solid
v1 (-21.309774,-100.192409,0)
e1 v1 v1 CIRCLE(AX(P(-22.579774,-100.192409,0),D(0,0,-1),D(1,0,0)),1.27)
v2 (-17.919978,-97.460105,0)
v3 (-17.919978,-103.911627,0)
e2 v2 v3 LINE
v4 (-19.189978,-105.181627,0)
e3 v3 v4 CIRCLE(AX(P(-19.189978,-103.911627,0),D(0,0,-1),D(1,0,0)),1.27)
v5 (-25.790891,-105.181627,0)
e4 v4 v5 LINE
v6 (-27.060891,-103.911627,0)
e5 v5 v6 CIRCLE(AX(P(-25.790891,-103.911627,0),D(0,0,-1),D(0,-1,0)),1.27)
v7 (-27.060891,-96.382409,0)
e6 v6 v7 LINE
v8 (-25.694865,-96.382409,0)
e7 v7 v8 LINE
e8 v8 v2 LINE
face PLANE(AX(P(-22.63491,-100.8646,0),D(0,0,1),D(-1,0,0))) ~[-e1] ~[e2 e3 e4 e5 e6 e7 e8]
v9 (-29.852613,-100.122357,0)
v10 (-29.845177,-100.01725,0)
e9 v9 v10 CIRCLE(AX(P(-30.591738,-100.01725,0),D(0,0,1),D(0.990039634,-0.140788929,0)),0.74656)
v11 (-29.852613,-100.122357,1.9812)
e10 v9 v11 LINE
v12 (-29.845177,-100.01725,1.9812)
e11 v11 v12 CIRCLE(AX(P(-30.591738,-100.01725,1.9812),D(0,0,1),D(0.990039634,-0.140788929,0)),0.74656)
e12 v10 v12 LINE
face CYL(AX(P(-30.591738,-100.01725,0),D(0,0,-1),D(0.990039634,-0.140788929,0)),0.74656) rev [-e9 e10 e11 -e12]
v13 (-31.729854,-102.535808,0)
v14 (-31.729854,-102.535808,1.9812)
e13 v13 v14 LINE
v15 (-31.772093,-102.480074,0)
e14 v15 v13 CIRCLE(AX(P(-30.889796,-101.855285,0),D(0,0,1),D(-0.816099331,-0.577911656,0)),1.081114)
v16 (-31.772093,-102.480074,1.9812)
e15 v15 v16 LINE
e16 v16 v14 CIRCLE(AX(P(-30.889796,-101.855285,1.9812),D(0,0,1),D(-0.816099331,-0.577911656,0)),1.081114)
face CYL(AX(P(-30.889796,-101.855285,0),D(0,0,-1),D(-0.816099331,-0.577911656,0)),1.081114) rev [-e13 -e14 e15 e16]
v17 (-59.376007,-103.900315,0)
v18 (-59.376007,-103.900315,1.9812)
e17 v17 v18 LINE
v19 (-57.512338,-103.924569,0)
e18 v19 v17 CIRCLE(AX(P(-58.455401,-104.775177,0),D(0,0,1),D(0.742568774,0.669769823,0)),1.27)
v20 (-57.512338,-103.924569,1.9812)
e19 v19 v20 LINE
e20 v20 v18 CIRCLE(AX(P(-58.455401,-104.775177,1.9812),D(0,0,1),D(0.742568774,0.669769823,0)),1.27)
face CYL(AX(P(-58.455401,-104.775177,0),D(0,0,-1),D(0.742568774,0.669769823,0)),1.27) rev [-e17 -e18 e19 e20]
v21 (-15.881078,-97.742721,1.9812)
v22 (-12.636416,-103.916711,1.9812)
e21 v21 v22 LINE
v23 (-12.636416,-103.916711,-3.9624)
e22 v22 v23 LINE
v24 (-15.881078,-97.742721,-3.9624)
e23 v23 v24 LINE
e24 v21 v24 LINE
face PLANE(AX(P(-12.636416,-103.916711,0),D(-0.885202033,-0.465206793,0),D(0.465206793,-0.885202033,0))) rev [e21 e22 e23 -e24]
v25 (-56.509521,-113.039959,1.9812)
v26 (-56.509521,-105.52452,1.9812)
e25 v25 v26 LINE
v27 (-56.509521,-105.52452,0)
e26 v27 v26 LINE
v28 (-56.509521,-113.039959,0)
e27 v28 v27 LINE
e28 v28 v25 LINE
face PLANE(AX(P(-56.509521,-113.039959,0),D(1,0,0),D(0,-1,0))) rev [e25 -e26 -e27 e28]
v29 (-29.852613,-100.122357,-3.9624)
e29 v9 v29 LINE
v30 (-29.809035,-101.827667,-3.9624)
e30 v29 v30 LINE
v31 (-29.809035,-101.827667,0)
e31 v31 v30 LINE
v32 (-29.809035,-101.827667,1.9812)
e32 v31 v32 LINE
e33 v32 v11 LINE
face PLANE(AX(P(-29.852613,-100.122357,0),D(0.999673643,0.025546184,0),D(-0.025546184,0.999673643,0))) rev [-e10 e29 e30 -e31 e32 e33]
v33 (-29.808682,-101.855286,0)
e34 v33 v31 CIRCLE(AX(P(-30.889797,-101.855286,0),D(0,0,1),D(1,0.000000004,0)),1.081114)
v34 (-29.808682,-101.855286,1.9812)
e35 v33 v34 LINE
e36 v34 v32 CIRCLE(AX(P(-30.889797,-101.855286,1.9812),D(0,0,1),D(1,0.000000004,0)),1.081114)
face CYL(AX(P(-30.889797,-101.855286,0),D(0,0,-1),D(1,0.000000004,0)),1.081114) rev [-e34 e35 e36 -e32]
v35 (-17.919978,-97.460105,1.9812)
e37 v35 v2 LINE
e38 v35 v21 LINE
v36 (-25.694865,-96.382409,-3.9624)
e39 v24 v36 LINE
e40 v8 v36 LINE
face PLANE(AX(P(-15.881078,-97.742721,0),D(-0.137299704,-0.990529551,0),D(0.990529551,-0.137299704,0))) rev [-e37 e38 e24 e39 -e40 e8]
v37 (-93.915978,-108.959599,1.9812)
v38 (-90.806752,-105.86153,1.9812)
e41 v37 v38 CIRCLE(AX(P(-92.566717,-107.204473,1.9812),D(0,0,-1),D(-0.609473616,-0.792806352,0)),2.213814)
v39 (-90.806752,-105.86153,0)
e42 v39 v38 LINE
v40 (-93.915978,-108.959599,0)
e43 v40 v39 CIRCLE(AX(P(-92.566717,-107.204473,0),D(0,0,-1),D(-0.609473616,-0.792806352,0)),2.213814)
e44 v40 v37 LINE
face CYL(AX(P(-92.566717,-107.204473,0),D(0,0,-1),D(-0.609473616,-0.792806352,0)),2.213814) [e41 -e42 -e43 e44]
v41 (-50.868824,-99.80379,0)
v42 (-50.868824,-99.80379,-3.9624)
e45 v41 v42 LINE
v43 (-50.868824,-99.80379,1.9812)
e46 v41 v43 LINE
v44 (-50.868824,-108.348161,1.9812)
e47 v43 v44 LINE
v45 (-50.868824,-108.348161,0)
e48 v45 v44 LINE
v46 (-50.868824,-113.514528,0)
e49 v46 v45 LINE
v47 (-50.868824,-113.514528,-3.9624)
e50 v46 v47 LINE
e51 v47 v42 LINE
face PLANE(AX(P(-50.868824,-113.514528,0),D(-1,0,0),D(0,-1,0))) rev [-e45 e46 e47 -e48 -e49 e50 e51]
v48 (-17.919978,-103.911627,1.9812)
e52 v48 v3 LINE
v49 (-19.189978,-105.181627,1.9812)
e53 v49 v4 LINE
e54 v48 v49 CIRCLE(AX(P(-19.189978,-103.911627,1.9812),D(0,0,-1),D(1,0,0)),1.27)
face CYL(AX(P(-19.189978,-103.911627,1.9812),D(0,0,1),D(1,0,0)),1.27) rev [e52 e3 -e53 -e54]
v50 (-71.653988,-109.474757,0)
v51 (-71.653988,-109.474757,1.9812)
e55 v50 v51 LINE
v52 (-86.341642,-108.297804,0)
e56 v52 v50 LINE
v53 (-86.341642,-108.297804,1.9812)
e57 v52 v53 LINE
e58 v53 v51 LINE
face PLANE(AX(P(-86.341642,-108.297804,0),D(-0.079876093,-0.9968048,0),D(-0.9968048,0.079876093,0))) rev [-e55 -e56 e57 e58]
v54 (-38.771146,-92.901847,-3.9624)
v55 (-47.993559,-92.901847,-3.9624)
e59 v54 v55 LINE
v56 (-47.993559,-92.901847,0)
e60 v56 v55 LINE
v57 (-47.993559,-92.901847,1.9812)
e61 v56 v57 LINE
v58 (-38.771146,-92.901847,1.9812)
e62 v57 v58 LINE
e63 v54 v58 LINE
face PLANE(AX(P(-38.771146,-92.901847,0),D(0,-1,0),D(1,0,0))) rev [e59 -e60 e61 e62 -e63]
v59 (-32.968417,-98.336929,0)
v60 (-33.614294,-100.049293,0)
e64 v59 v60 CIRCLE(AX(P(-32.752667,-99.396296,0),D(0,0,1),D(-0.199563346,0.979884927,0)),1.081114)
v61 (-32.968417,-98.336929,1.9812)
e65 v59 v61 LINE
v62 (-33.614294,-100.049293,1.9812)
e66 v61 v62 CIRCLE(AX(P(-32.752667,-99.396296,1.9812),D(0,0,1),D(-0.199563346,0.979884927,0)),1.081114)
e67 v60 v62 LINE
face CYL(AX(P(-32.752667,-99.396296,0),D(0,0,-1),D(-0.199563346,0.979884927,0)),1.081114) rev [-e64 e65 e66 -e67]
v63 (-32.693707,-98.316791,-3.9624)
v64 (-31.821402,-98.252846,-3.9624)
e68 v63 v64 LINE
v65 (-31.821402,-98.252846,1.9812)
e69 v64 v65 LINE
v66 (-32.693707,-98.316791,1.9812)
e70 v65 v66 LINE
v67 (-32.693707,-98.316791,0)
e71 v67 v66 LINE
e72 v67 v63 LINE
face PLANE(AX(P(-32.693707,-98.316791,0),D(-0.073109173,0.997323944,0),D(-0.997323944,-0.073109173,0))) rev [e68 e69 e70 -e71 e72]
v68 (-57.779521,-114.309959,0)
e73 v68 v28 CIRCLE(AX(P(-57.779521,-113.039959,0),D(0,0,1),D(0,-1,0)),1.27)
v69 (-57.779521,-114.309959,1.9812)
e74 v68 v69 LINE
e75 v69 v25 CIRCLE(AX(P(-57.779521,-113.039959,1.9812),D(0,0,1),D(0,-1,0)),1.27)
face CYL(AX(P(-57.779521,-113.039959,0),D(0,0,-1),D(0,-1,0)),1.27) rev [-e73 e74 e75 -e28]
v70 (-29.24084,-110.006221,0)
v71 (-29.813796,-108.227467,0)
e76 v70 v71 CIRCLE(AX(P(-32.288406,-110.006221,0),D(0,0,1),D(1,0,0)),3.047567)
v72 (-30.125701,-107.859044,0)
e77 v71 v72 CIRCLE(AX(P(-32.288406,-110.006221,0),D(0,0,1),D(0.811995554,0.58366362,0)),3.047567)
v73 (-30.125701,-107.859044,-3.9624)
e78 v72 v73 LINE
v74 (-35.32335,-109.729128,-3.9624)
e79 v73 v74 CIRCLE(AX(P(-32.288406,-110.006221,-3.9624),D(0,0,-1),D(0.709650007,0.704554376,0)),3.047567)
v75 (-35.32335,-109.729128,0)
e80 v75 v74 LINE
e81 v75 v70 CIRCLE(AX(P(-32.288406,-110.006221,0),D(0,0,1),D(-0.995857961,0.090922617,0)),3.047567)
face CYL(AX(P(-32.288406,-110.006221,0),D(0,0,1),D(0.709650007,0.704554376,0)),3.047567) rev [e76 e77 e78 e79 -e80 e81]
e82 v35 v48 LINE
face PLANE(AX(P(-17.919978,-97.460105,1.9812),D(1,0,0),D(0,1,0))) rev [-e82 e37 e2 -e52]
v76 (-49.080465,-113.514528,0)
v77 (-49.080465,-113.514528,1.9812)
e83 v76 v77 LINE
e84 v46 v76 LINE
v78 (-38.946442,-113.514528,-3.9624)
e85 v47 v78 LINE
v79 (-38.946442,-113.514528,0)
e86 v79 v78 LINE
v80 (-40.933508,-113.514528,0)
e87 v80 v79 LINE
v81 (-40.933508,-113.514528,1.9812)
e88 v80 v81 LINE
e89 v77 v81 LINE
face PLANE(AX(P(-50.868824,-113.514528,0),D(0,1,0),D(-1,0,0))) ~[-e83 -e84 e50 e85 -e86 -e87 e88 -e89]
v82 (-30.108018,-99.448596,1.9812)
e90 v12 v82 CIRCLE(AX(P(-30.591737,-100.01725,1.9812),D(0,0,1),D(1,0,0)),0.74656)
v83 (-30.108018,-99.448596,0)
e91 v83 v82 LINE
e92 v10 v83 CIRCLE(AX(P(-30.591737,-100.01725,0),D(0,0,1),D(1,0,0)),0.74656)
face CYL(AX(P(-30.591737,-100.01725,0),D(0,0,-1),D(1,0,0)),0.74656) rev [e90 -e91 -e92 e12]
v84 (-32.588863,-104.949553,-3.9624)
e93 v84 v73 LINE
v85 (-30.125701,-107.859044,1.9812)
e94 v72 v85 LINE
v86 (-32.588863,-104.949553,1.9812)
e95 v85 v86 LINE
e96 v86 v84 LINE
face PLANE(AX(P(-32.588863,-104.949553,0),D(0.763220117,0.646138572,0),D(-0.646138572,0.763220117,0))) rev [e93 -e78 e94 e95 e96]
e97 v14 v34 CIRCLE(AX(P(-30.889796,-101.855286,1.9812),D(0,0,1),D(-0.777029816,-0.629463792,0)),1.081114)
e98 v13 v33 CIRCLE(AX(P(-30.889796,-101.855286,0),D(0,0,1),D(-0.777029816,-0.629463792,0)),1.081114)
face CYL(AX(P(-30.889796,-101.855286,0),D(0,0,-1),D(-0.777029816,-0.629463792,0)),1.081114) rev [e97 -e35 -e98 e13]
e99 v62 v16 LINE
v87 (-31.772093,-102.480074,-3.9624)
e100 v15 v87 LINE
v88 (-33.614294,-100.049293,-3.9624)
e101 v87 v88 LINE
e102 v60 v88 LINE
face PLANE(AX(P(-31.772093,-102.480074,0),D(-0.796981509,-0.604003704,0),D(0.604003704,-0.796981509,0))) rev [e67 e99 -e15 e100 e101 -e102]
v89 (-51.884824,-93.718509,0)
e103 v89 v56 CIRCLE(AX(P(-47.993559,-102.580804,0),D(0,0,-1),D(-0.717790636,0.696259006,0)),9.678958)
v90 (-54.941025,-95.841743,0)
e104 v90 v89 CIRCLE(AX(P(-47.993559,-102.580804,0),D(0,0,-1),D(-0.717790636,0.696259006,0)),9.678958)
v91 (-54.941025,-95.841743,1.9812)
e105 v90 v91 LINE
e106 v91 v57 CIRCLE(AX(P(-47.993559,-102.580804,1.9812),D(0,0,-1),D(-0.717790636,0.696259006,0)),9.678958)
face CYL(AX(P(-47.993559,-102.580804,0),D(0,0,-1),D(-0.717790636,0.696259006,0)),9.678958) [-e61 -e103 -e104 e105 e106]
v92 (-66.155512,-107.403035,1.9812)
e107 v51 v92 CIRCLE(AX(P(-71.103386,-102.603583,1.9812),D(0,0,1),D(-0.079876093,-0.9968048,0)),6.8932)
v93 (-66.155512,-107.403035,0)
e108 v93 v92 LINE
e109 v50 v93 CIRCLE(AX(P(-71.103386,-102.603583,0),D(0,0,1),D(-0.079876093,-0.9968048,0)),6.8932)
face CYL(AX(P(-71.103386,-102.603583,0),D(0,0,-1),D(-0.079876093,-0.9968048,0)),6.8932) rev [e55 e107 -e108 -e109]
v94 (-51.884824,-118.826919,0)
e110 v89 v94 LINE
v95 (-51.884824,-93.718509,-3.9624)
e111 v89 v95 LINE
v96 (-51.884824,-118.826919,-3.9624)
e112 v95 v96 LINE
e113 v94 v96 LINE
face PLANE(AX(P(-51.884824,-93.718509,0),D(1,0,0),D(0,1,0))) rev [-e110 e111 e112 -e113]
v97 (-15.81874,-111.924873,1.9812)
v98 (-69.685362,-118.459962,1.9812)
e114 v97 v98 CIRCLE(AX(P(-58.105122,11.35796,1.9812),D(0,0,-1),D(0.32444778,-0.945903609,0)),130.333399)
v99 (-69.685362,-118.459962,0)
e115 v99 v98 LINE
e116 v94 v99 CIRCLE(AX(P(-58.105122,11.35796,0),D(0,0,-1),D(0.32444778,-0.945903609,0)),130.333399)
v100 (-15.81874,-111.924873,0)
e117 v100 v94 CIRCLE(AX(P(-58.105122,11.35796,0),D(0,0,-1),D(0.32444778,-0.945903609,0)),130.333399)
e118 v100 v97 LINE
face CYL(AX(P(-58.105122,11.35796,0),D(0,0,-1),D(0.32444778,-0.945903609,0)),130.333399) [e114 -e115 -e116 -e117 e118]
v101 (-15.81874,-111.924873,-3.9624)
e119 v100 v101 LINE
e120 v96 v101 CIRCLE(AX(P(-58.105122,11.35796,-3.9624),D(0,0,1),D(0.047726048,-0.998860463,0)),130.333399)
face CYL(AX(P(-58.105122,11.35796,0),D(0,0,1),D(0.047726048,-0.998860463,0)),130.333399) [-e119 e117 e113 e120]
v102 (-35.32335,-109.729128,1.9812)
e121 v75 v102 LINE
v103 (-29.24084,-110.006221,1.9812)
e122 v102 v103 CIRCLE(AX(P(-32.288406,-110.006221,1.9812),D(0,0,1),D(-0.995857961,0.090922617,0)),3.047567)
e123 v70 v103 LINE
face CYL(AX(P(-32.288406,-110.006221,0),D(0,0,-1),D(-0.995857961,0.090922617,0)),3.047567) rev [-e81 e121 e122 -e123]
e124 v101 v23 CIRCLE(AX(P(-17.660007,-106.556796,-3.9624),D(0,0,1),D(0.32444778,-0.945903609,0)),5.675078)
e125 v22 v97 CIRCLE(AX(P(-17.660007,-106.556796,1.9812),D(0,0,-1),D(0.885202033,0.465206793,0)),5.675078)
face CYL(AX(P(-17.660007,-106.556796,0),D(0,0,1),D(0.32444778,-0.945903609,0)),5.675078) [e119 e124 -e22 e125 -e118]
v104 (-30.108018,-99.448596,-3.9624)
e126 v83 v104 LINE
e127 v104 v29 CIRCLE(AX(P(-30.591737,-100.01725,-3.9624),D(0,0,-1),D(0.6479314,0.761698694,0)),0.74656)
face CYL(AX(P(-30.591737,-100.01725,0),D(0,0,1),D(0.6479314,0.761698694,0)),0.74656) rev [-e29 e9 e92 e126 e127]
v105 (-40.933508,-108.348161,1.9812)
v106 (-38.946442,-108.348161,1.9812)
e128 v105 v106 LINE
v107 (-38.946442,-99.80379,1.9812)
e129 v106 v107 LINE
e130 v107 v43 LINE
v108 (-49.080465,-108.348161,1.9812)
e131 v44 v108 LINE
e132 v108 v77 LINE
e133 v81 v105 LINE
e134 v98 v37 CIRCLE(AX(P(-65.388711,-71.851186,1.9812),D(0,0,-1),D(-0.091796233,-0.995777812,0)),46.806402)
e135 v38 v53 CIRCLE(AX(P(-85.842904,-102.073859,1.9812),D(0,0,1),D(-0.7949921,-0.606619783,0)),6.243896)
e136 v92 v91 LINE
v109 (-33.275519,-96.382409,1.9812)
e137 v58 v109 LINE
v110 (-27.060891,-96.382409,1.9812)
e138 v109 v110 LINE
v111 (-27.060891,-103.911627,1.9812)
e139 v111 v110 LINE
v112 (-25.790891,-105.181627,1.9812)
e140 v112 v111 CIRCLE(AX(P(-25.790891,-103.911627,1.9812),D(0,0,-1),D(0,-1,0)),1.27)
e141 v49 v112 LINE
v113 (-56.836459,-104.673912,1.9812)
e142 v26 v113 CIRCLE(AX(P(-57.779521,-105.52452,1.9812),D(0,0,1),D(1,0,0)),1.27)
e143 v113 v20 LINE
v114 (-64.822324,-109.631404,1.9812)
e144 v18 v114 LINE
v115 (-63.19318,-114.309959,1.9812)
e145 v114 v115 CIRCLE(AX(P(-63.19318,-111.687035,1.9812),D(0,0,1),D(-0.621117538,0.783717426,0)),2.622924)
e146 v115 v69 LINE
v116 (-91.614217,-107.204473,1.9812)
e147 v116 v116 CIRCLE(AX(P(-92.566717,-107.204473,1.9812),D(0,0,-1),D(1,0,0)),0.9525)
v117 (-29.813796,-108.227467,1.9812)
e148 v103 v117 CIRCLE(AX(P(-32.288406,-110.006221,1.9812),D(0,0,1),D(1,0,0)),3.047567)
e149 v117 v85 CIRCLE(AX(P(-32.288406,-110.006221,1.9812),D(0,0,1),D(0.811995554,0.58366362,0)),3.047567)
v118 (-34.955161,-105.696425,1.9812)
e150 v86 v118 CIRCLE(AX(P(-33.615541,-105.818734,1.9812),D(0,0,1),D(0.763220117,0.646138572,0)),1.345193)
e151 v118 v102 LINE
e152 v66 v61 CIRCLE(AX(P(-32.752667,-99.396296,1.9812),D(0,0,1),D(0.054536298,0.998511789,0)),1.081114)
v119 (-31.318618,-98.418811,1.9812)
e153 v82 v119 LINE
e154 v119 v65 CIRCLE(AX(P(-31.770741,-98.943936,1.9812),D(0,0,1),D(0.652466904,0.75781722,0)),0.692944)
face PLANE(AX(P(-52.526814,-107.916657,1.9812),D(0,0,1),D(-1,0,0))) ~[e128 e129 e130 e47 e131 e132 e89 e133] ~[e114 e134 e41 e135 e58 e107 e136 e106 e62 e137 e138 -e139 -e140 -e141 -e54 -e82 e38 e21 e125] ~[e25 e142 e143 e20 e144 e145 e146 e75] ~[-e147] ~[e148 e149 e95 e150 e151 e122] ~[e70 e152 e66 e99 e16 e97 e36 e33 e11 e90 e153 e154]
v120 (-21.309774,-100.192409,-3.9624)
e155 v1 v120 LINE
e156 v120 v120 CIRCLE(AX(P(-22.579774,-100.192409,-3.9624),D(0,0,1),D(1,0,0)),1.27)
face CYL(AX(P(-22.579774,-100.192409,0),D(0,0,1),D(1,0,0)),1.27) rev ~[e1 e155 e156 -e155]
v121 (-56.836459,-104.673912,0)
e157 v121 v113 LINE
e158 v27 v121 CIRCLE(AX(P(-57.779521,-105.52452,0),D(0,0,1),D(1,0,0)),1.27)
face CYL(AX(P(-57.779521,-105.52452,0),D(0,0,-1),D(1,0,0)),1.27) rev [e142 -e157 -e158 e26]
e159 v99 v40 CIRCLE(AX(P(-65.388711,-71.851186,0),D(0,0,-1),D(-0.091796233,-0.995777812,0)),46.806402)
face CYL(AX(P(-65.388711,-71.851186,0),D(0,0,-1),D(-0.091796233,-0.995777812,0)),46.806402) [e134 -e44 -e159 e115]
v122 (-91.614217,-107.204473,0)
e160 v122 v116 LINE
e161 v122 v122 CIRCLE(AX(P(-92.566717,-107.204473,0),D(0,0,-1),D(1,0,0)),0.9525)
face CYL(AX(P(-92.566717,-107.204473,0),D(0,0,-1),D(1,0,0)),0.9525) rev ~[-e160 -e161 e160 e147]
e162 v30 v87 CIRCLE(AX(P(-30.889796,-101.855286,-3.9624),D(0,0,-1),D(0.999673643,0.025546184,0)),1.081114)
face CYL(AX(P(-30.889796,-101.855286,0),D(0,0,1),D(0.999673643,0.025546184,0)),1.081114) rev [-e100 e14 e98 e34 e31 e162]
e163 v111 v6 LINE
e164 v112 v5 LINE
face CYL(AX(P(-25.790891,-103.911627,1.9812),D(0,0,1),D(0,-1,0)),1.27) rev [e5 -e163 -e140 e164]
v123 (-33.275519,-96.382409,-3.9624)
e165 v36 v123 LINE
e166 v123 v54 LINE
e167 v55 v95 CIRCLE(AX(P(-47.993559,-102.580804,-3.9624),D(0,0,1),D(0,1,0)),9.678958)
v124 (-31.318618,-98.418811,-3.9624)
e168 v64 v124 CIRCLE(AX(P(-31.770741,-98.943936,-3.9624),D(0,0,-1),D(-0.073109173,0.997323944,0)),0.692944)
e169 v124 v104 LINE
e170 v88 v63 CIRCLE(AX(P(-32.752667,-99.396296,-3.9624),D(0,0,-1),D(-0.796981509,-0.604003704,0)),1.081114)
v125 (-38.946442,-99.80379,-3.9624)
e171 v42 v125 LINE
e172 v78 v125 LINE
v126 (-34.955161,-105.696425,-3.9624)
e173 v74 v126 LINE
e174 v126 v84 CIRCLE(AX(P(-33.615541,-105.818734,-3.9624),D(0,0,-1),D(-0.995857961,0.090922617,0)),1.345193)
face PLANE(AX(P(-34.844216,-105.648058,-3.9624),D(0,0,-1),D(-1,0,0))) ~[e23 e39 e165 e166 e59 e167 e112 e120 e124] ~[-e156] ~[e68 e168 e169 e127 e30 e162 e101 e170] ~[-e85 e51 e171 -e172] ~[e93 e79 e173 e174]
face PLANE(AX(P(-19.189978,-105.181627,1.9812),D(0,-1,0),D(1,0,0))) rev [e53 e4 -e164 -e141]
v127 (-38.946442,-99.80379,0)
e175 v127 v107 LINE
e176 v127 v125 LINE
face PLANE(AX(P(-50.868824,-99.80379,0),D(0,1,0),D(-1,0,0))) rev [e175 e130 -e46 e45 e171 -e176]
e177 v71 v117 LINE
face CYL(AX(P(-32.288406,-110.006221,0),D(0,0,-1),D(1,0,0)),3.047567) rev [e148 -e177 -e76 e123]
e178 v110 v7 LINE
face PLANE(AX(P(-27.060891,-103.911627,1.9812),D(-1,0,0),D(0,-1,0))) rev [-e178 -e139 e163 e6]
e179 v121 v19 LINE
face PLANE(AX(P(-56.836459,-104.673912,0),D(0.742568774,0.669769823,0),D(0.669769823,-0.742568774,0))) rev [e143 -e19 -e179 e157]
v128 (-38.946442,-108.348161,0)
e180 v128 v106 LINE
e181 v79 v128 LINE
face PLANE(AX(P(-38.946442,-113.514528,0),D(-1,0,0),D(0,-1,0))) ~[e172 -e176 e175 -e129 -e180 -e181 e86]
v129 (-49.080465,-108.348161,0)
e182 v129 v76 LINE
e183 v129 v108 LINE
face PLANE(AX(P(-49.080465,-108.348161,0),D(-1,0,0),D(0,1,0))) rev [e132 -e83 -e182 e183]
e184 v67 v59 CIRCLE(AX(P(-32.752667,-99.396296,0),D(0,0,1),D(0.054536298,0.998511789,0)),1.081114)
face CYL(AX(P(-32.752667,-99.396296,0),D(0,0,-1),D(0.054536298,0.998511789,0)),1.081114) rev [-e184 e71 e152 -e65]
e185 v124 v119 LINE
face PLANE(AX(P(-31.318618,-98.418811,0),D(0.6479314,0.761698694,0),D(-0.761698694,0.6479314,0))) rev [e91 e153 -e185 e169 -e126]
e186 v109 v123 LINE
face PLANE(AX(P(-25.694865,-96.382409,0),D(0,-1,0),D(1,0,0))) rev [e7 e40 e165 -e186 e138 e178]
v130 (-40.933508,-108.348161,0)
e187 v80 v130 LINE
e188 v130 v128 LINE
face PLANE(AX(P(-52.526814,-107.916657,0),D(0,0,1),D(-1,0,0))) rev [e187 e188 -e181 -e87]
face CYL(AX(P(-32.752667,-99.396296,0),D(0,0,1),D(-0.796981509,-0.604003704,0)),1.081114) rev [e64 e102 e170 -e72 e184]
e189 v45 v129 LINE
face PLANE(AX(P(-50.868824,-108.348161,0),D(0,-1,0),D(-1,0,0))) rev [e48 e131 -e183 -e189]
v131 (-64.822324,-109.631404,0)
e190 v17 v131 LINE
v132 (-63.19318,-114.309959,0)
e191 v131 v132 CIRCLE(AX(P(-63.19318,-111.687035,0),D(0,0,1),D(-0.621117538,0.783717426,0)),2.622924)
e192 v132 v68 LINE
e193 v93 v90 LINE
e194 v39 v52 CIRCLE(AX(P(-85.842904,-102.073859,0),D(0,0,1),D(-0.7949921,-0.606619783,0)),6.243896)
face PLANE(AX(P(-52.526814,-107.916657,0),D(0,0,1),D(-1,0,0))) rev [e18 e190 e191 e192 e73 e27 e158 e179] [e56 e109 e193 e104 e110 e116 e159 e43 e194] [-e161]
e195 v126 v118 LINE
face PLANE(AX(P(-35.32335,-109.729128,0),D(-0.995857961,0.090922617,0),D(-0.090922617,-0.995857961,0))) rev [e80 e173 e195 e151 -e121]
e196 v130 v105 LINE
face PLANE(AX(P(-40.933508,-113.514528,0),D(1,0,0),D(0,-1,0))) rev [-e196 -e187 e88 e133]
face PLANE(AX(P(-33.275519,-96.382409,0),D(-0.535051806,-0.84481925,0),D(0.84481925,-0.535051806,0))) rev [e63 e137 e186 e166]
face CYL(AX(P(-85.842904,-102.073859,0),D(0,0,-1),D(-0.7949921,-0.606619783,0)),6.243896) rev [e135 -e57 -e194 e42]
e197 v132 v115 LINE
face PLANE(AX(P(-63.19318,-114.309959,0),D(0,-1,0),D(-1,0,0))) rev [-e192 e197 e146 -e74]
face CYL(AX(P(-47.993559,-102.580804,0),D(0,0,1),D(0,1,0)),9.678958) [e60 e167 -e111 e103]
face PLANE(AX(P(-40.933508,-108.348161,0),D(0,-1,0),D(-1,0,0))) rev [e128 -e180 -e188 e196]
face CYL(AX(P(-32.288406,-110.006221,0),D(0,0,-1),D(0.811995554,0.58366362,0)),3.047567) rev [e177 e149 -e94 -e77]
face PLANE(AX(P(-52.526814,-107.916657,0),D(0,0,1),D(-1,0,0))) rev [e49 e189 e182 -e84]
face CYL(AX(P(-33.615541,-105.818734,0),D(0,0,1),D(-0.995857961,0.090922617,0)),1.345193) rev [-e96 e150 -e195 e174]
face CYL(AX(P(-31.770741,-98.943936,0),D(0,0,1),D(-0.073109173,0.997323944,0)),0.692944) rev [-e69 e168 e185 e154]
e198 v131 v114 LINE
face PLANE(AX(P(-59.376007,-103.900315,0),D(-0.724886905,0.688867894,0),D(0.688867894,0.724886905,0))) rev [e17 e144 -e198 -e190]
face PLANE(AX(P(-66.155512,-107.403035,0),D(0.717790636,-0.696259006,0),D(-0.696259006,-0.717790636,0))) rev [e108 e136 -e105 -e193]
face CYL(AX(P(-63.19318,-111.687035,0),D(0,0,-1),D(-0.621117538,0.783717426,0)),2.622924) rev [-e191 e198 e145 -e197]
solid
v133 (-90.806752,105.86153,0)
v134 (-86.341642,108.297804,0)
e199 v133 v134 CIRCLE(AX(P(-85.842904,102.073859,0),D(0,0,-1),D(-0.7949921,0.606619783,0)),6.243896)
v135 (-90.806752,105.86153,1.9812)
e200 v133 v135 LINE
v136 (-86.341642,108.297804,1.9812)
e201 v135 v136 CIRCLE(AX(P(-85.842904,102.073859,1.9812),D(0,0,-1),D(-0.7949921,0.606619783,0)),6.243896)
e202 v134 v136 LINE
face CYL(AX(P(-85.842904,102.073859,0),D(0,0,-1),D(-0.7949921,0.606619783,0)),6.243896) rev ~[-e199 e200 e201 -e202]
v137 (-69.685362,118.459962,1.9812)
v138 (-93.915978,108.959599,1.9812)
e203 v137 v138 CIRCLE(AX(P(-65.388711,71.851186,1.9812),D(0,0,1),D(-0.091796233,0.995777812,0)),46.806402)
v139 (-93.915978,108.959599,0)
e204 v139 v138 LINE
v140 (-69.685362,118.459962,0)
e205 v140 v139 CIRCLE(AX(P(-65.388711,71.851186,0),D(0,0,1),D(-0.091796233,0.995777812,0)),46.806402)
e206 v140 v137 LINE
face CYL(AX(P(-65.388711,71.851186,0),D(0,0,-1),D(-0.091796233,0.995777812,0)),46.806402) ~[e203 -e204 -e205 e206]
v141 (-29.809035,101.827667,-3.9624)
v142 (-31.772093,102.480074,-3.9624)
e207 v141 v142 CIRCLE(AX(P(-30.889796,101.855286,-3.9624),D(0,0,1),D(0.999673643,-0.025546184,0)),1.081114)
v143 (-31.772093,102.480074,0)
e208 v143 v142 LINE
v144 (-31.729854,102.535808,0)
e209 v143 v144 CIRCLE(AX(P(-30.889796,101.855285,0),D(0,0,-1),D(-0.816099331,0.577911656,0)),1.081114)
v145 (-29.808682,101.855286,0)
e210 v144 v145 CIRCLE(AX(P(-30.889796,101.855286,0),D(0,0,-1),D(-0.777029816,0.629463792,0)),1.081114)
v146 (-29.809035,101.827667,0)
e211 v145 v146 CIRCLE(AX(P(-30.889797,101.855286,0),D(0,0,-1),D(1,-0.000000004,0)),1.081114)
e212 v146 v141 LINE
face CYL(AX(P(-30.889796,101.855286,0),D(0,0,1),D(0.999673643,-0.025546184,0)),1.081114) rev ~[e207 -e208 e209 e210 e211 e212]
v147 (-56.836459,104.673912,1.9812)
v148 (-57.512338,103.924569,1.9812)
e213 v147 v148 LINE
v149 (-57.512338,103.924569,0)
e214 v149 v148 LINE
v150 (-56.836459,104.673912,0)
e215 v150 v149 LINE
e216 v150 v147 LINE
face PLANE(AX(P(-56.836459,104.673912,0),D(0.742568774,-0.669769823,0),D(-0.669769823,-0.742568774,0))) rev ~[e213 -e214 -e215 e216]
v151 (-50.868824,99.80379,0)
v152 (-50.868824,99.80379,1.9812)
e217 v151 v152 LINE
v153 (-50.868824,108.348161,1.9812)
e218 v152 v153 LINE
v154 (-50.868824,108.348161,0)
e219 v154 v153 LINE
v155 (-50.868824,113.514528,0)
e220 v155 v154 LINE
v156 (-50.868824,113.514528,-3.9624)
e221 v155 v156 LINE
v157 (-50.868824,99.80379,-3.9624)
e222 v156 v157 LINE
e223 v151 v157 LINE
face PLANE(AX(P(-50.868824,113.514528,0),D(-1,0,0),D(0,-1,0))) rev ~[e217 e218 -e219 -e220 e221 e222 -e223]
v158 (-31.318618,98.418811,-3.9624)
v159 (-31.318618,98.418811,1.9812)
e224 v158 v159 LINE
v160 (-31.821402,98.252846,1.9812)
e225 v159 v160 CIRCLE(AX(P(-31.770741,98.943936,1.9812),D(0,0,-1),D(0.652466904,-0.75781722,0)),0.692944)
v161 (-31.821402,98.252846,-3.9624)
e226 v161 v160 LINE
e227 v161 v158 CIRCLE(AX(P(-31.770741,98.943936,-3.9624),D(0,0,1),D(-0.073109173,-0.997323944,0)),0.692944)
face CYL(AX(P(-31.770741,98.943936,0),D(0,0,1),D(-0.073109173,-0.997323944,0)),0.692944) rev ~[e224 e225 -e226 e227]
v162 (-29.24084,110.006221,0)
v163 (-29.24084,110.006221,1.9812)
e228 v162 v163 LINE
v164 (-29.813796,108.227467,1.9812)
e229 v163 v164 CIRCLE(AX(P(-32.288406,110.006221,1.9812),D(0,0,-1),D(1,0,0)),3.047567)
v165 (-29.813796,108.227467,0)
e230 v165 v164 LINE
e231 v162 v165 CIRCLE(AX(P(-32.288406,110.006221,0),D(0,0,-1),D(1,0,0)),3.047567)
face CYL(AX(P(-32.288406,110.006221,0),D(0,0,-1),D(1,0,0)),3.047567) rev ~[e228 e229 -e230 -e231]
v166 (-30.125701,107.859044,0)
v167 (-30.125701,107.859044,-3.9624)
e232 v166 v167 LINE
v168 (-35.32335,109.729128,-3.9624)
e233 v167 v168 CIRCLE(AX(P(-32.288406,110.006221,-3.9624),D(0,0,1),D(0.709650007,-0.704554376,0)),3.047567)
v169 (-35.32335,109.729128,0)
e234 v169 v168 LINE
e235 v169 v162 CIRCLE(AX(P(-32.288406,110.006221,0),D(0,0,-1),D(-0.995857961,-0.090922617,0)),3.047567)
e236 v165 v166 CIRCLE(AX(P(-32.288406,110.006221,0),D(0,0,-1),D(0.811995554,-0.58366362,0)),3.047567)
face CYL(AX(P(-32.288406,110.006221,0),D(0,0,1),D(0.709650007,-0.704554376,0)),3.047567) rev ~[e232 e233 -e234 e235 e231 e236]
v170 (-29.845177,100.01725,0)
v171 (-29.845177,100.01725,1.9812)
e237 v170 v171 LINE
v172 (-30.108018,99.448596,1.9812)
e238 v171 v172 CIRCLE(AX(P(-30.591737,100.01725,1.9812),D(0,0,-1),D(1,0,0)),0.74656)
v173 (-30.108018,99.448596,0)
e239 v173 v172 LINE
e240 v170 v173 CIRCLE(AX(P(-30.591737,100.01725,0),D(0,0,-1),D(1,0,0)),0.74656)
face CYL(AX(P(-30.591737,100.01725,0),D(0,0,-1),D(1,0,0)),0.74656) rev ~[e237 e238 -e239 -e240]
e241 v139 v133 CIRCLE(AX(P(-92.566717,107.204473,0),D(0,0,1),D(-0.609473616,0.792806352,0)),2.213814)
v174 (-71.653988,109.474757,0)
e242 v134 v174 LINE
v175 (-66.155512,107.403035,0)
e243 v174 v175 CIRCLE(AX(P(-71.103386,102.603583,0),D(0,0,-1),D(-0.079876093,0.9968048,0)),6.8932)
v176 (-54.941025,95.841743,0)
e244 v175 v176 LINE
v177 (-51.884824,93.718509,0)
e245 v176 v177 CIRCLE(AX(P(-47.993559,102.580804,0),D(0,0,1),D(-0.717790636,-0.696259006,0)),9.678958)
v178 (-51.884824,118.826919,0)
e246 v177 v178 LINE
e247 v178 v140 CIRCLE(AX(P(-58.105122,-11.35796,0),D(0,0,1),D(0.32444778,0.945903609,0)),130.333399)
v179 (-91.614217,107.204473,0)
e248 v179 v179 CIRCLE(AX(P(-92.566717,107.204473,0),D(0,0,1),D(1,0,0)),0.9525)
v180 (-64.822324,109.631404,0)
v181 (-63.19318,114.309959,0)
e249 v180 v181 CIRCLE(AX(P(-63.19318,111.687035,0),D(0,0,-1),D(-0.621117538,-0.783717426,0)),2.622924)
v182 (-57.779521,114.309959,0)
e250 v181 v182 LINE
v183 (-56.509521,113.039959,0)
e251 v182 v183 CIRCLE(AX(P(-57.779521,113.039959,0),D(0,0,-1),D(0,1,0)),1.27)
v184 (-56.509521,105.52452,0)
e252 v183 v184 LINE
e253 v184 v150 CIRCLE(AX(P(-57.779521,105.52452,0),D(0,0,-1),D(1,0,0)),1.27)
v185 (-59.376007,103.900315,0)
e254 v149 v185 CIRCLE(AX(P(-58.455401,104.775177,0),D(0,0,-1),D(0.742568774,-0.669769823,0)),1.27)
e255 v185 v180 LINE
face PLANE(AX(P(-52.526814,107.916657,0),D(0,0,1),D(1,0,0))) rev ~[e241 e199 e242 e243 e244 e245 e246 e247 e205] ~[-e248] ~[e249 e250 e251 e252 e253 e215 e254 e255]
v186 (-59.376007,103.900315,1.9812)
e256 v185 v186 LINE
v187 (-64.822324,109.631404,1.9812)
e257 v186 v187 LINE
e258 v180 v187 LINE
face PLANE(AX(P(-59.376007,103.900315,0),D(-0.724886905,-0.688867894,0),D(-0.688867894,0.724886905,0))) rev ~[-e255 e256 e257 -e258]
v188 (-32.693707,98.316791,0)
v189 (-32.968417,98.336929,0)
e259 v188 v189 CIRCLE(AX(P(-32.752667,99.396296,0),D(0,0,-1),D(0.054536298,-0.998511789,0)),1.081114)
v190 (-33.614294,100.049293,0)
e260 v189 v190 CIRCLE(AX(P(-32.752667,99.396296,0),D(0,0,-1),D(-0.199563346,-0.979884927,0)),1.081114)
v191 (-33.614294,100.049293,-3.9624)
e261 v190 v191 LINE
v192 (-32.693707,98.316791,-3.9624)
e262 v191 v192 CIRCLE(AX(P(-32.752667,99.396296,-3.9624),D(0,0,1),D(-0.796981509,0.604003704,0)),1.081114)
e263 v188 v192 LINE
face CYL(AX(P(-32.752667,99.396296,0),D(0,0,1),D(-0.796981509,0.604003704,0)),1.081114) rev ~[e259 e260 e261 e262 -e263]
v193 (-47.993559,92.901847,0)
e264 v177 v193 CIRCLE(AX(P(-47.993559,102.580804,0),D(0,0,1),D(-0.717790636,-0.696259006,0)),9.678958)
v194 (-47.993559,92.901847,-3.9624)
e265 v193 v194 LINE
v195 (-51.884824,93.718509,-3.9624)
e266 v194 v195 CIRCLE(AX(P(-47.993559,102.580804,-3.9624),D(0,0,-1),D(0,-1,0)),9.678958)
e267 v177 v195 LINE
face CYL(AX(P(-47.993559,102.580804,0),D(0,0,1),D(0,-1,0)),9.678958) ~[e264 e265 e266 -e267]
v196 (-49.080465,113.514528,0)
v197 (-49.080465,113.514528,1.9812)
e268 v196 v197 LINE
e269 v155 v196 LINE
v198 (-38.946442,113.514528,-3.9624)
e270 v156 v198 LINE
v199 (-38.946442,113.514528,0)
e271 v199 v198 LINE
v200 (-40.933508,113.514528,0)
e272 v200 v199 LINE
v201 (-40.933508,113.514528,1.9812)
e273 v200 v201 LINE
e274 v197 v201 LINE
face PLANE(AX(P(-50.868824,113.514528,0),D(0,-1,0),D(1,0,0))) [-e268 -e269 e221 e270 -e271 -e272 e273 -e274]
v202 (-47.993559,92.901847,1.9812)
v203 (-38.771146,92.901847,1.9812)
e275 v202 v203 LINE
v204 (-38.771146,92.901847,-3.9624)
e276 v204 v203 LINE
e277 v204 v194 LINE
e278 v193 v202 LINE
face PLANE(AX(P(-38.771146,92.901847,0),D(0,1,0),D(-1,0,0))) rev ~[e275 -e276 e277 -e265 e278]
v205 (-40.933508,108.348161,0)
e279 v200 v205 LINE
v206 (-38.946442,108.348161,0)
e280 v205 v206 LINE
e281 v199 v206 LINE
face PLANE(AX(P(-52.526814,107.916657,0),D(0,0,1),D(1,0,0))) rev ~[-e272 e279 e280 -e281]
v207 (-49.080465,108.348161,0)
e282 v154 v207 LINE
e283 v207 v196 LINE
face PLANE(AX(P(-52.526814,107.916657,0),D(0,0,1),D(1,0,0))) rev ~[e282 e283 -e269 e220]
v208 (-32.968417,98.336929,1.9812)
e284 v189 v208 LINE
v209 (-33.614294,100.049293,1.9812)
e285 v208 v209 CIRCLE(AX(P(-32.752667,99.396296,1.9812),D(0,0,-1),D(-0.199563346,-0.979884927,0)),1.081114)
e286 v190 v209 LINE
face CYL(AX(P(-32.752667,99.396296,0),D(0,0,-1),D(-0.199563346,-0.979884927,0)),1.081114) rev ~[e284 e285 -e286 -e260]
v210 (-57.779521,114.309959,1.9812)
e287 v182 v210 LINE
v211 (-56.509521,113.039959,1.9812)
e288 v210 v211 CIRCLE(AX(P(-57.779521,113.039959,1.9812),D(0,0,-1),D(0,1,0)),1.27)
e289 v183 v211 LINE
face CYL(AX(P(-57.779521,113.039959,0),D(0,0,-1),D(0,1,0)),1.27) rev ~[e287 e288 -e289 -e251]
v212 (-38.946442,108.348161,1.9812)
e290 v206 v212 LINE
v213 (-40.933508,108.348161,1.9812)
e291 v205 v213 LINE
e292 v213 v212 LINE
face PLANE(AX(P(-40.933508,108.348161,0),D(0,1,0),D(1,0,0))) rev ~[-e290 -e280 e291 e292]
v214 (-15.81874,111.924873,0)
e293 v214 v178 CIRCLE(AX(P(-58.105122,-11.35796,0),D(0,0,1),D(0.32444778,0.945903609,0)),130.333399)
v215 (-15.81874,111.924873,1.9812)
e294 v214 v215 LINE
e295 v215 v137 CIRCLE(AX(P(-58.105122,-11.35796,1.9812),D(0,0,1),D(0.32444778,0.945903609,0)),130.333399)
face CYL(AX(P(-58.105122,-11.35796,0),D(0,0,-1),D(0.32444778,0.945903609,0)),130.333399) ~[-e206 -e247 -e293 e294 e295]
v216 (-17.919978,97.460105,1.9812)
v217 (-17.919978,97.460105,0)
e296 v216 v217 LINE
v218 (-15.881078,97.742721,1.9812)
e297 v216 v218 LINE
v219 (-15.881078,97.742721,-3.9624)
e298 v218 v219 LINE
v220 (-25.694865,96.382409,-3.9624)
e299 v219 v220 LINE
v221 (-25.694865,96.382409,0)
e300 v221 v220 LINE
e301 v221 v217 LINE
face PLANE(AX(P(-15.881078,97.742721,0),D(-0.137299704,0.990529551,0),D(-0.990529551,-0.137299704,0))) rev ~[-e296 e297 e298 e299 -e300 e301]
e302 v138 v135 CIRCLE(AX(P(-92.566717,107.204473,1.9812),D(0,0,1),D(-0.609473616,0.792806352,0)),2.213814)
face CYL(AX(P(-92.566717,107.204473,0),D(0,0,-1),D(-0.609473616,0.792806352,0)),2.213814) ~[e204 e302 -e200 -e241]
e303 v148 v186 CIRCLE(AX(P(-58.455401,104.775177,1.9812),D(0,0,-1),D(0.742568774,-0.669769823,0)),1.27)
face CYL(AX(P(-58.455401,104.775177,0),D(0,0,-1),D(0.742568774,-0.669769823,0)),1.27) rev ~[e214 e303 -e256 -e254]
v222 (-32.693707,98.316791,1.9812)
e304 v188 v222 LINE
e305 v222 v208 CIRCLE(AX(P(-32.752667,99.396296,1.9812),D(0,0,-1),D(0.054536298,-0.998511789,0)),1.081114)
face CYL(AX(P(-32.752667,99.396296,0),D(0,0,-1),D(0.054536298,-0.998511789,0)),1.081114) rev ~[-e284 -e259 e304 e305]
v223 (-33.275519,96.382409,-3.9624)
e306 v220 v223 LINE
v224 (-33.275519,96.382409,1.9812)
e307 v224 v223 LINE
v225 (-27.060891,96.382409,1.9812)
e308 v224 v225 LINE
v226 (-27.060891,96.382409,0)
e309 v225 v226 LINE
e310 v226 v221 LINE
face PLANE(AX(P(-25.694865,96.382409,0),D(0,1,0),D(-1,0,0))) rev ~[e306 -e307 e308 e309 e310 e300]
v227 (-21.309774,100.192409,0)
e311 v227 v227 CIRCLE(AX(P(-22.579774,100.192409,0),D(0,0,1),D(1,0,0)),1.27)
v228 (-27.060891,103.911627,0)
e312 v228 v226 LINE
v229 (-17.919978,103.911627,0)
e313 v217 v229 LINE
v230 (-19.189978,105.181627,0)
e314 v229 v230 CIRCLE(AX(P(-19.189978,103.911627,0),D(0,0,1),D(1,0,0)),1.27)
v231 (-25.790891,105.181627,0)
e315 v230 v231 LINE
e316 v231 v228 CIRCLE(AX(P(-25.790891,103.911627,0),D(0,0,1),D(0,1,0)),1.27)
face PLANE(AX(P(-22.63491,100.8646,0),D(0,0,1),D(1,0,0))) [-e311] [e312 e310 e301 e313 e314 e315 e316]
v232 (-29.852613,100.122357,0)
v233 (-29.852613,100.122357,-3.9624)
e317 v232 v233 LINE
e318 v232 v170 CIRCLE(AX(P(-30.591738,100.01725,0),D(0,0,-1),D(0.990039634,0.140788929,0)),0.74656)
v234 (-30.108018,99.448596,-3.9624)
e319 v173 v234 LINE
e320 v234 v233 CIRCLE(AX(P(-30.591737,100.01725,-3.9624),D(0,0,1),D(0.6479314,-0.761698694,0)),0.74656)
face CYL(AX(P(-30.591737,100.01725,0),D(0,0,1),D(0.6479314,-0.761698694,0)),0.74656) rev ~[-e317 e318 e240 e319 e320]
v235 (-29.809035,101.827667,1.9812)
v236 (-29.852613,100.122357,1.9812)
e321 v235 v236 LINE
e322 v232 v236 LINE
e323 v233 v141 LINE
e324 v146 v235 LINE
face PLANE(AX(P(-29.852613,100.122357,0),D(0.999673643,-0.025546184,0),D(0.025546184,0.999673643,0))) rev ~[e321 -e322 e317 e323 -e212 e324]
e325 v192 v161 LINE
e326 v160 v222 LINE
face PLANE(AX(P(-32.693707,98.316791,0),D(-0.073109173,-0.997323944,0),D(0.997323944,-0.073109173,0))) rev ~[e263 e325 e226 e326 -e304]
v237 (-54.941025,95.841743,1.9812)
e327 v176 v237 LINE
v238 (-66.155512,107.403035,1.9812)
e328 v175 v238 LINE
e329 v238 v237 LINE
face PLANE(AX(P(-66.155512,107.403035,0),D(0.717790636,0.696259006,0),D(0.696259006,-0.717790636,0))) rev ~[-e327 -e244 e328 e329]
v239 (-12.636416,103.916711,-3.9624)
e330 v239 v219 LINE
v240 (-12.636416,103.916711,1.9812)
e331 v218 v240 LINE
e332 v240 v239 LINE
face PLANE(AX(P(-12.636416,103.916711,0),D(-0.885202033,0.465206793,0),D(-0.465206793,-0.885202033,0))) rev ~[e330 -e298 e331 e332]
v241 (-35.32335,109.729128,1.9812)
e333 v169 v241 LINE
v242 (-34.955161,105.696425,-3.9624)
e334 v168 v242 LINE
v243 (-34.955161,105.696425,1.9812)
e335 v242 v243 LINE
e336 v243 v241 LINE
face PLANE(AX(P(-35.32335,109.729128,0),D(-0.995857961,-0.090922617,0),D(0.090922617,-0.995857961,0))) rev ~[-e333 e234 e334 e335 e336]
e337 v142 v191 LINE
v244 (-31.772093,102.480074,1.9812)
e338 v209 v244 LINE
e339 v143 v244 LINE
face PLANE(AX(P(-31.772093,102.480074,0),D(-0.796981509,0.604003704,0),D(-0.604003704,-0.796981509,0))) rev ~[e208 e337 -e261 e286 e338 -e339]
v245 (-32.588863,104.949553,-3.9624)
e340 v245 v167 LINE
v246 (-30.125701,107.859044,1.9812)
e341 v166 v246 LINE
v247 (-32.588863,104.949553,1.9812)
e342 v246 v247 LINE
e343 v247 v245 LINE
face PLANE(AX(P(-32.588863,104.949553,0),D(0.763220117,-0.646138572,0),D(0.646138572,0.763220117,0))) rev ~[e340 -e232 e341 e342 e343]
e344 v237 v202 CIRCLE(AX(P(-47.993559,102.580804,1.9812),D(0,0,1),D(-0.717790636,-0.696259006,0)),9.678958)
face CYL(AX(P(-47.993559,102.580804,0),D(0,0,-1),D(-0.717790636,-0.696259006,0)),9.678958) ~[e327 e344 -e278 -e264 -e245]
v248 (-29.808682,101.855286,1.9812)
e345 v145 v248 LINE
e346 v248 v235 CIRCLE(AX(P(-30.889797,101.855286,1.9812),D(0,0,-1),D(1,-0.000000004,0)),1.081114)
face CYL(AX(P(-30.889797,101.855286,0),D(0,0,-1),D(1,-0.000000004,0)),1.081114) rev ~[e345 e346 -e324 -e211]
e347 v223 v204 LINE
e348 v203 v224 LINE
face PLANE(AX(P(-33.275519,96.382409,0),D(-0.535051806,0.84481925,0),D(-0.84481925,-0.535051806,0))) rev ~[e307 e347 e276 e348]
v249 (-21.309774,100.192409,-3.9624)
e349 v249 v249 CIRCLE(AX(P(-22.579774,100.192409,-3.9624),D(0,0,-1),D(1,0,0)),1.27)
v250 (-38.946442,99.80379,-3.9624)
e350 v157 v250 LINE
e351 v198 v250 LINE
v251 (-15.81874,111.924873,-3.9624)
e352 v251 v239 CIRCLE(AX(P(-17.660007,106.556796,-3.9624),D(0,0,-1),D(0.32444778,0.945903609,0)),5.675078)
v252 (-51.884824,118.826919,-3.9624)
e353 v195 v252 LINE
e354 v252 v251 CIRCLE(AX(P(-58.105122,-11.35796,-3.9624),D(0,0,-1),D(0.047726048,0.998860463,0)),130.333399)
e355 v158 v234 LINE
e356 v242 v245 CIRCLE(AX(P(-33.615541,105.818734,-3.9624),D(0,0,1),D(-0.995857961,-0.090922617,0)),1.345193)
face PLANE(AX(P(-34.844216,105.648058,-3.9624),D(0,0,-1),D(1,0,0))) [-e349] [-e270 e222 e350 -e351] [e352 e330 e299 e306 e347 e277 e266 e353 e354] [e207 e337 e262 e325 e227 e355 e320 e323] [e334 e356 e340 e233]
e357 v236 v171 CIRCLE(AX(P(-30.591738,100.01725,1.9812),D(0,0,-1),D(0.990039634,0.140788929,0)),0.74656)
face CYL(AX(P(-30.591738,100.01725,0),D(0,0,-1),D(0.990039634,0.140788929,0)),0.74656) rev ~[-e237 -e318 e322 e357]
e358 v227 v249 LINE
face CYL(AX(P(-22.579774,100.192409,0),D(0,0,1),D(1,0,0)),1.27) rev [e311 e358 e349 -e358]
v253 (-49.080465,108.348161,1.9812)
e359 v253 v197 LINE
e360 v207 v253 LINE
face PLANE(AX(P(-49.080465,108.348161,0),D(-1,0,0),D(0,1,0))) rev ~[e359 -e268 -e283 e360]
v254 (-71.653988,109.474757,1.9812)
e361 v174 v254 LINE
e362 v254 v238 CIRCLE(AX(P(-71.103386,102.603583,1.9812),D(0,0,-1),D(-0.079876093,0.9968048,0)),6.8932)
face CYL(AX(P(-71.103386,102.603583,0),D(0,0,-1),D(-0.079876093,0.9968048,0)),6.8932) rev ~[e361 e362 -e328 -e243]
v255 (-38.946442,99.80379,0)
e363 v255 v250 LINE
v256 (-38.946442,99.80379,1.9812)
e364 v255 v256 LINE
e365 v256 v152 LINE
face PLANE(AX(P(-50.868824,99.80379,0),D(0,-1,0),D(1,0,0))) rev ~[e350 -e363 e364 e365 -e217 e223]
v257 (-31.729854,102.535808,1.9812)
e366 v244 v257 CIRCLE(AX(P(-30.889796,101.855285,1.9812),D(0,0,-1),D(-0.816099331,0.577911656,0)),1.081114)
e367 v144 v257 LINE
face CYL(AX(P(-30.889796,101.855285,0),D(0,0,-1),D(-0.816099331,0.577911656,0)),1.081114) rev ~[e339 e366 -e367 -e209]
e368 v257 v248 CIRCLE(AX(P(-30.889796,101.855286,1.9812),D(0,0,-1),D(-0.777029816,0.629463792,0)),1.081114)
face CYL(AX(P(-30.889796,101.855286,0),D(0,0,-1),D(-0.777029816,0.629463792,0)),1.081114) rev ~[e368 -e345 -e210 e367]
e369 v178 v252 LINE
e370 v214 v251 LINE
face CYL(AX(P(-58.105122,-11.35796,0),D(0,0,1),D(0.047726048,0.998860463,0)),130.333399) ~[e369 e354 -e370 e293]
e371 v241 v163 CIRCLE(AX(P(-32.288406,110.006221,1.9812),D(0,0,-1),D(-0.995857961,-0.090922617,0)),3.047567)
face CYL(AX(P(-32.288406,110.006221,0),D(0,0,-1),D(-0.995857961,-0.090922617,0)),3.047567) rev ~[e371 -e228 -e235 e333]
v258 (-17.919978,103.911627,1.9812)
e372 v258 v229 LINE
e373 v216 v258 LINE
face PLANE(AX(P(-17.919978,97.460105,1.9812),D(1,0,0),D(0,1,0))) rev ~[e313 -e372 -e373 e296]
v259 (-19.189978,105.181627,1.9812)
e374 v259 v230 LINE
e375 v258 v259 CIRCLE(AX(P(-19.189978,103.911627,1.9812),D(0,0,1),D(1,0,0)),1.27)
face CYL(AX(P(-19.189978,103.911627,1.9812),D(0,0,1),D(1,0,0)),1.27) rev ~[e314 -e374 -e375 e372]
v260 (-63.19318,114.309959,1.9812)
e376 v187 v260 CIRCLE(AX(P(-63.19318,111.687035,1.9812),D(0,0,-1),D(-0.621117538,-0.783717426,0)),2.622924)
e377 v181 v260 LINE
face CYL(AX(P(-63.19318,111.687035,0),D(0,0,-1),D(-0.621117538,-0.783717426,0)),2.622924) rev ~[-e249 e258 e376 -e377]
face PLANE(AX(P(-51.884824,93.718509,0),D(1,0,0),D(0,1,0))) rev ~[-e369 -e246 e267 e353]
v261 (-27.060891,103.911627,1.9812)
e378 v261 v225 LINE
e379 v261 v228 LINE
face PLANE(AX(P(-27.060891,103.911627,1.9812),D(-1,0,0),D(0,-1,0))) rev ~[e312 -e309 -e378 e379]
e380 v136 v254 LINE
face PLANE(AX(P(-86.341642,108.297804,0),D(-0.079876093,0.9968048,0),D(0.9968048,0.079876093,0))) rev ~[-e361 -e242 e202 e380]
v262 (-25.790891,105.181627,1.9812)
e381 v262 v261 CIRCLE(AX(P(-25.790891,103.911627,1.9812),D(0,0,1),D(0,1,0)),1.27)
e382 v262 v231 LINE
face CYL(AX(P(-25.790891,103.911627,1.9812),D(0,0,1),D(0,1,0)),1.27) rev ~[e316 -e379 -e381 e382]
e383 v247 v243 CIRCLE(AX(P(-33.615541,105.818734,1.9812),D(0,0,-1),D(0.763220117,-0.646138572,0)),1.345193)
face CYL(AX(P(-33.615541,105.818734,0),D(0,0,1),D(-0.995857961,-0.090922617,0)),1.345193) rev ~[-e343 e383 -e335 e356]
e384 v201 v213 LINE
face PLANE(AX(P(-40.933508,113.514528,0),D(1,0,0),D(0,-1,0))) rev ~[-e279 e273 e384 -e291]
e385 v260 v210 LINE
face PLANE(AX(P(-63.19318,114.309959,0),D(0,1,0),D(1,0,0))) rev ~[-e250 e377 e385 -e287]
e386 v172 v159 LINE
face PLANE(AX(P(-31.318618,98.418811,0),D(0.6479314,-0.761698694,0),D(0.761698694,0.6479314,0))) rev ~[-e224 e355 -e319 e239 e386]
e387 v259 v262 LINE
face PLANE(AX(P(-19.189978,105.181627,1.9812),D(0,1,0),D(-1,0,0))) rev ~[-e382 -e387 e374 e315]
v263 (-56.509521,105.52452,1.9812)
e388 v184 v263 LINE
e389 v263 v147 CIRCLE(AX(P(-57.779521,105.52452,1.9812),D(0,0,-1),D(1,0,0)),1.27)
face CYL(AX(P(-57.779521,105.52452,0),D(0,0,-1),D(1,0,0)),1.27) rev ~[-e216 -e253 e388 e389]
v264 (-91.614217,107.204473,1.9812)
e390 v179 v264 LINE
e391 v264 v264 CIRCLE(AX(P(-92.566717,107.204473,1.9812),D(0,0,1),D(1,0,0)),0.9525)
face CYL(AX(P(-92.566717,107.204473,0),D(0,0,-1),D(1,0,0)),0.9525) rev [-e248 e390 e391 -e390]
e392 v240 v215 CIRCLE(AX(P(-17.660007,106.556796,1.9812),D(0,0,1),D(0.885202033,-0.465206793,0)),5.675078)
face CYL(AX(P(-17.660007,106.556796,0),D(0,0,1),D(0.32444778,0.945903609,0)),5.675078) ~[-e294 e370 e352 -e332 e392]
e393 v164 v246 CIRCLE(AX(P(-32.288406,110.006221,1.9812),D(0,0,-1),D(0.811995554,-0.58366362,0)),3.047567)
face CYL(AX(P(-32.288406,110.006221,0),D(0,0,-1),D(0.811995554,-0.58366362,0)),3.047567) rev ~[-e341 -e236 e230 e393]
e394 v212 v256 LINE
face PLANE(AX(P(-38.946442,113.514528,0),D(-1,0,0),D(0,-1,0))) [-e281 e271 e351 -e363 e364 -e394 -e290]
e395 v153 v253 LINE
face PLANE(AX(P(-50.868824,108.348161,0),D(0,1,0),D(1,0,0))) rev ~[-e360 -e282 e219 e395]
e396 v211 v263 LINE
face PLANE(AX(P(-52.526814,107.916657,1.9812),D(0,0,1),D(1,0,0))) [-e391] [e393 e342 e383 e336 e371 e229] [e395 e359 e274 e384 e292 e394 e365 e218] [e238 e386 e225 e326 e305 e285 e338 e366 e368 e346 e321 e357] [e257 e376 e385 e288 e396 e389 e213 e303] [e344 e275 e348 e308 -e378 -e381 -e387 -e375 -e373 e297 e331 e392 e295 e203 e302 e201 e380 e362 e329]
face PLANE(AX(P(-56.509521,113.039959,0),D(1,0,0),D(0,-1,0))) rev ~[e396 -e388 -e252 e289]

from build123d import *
from build123d import SkipClean  # not in build123d's __all__

# Parameters (mm, degrees)
F0_R     = 1.27
F0_R_2   = 0.9525
F1_DEPTH = 1.9812
F2_W     = 11.9223818183
F2_H     = 13.7107372284
F2_R     = 1.27
F3_DEPTH = 3.9624
F5_DEPTH = 1.9812


# Not quite as in the source:
# - after a boolean that leaves OpenCascade's solid faulty, fix() repairs it


with BuildPart() as f1:
    # F0 (on Top) → F1 (new body)
    with BuildSketch(Plane.XY):
        with BuildLine():
            Line((-47.9935594662, 92.9018468329), (-38.7711464414, 92.9018468329))
            Line((-38.7711464414, 92.9018468329), (-33.2755186414, 96.3824086013))
            Line((-33.2755186414, 96.3824086013), (-25.6948654508, 96.3824086013))
            Line((-25.6948654508, 96.3824086013), (-15.8810783178, 97.7427214384))
            Line((-15.8810783178, 97.7427214384), (-12.636416007, 103.9167105482))
            ThreePointArc((-12.636416007, 103.9167105482), (-12.3860869147, 108.6525727702), (-15.8187403188, 111.9248726108))
            ThreePointArc((-15.8187403188, 111.9248726108), (-42.408191436, 118.0267426348), (-69.6853622794, 118.4599623084))
            ThreePointArc((-69.6853622794, 118.4599623084), (-82.4742788904, 115.4278151789), (-93.9159779713, 108.9595985437))
            ThreePointArc((-93.9159779713, 108.9595985437), (-94.1293035133, 105.6362591622), (-90.8067524433, 105.8615297079))
            ThreePointArc((-90.8067524433, 105.8615297079), (-88.8335264193, 107.5549552633), (-86.3416423602, 108.2978044339))
            Line((-86.3416423602, 108.2978044339), (-71.653987872, 109.474757484))
            ThreePointArc((-71.653987872, 109.474757484), (-68.6729520146, 109.0541017361), (-66.1555117331, 107.4030352715))
            Line((-66.1555117331, 107.4030352715), (-54.9410246313, 95.841743052))
            ThreePointArc((-54.9410246313, 95.841743052), (-51.7655039912, 93.6670703781), (-47.9935594662, 92.9018468329))
        make_face()
        with BuildLine():
            ThreePointArc((-31.729853951, 102.5358076193), (-30.5288188939, 102.8743550973), (-29.8086822236, 101.8552855317))
            ThreePointArc((-29.8086822236, 101.8552855317), (-29.8087704345, 101.8414752371), (-29.8090350527, 101.8276671962))
            Line((-29.8090350527, 101.8276671962), (-29.852613442, 100.1223570045))
            ThreePointArc((-29.852613442, 100.1223570045), (-29.8470387538, 100.0699346624), (-29.8451774306, 100.0172496117))
            ThreePointArc((-29.8451774306, 100.0172496117), (-29.9140658389, 99.7040195755), (-30.1080177856, 99.4485957889))
            Line((-30.1080177856, 99.4485957889), (-31.318617745, 98.418811003))
            ThreePointArc((-31.318617745, 98.418811003), (-31.5535333525, 98.285914355), (-31.821401526, 98.2528461926))
            Line((-31.821401526, 98.2528461926), (-32.6937066692, 98.3167908194))
            ThreePointArc((-32.6937066692, 98.3167908194), (-32.8317059691, 98.3180750151), (-32.9684173403, 98.336928579))
            ThreePointArc((-32.9684173403, 98.336928579), (-33.7642168357, 99.014754834), (-33.6142944517, 100.0492926766))
            Line((-33.6142944517, 100.0492926766), (-31.7720925497, 102.4800738847))
            ThreePointArc((-31.7720925497, 102.4800738847), (-31.751424005, 102.5082823627), (-31.729853951, 102.5358076193))
        make_face(mode=Mode.SUBTRACT)
        with Locations((-22.5797742605, 100.1924086013)):
            Circle(F0_R, mode=Mode.SUBTRACT)
        with Locations((-92.566716894, 107.2044729315)):
            Circle(F0_R_2, mode=Mode.SUBTRACT)
        with BuildLine():
            ThreePointArc((-57.7795208585, 114.3099591136), (-56.8814952464, 113.9379847257), (-56.5095208585, 113.0399591136))
            Line((-56.5095208585, 113.0399591136), (-56.5095208585, 105.5245197072))
            ThreePointArc((-56.5095208585, 105.5245197072), (-56.5940696416, 105.0688823379), (-56.8364585157, 104.6739120317))
            Line((-56.8364585157, 104.6739120317), (-57.5123382575, 103.924569237))
            ThreePointArc((-57.5123382575, 103.924569237), (-58.4388736983, 103.5052844519), (-59.3760069692, 103.9003146871))
            Line((-59.3760069692, 103.9003146871), (-64.8223236203, 109.6314042807))
            ThreePointArc((-64.8223236203, 109.6314042807), (-65.6702235375, 112.5495796966), (-63.193179667, 114.3099591136))
            Line((-63.193179667, 114.3099591136), (-57.7795208585, 114.3099591136))
        make_face(mode=Mode.SUBTRACT)
        Polygon((-40.933508426, 108.3481609821), (-38.946442306, 108.3481609821), (-38.946442306, 99.8037904501), (-50.8688241243, 99.8037904501), (-50.8688241243, 108.3481609821), (-49.0804649889, 108.3481609821), (-49.0804649889, 113.5145276785), (-40.933508426, 113.5145276785), align=None, mode=Mode.SUBTRACT)
        with BuildLine():
            ThreePointArc((-35.3233501937, 109.7291281762), (-32.4270965422, 113.0506303681), (-29.2408396166, 110.0062209297))
            ThreePointArc((-29.2408396166, 110.0062209297), (-29.3876130121, 109.0718435745), (-29.8137957369, 108.2274670254))
            ThreePointArc((-29.8137957369, 108.2274670254), (-29.9624421423, 108.0370704325), (-30.1257006344, 107.8590443638))
            Line((-30.1257006344, 107.8590443638), (-32.5888625406, 104.9495528088))
            ThreePointArc((-32.5888625406, 104.9495528088), (-34.0204329464, 104.5359221908), (-34.9551612301, 105.6964251639))
            Line((-34.9551612301, 105.6964251639), (-35.3233501937, 109.7291281762))
        make_face(mode=Mode.SUBTRACT)
    extrude(amount=F1_DEPTH)

    # F2 (on face) → F3 (join)
    with BuildSketch(Plane(origin=(0, 0, 0), x_dir=(1, 0, 0), z_dir=(0, 0, -1))):
        with BuildLine():
            ThreePointArc((-15.8187403188, -111.9248726108), (-12.3860869147, -108.6525727702), (-12.636416007, -103.9167105482))
            Line((-12.636416007, -103.9167105482), (-15.8810783178, -97.7427214384))
            Line((-15.8810783178, -97.7427214384), (-25.6948654508, -96.3824086013))
            Line((-25.6948654508, -96.3824086013), (-33.2755186414, -96.3824086013))
            Line((-33.2755186414, -96.3824086013), (-38.7711464414, -92.9018468329))
            Line((-38.7711464414, -92.9018468329), (-47.9935594662, -92.9018468329))
            ThreePointArc((-47.9935594662, -92.9018468329), (-49.9815784423, -93.1082123487), (-51.8848241243, -93.7185090381))
            Line((-51.8848241243, -93.7185090381), (-51.8848241243, -118.8269193207))
            ThreePointArc((-51.8848241243, -118.8269193207), (-33.6074883899, -116.652433517), (-15.8187403188, -111.9248726108))
        make_face()
        with Locations((-44.9076332152, -106.6591590643)):
            Rectangle(F2_W, F2_H, mode=Mode.SUBTRACT)
        with BuildLine():
            Line((-32.5888625406, -104.9495528088), (-30.1257006344, -107.8590443638))
            ThreePointArc((-30.1257006344, -107.8590443638), (-31.2566588837, -112.873826319), (-35.3233501937, -109.7291281762))
            Line((-35.3233501937, -109.7291281762), (-34.9551612301, -105.6964251639))
            ThreePointArc((-34.9551612301, -105.6964251639), (-34.0204329464, -104.5359221908), (-32.5888625406, -104.9495528088))
        make_face(mode=Mode.SUBTRACT)
        with BuildLine():
            ThreePointArc((-29.8090350527, -101.8276671962), (-30.5488332951, -102.8812249507), (-31.7720925497, -102.4800738847))
            Line((-31.7720925497, -102.4800738847), (-33.6142944517, -100.0492926766))
            ThreePointArc((-33.6142944517, -100.0492926766), (-33.7073705562, -98.8890012798), (-32.6937066692, -98.3167908194))
            Line((-32.6937066692, -98.3167908194), (-31.821401526, -98.2528461926))
            ThreePointArc((-31.821401526, -98.2528461926), (-31.5535333525, -98.285914355), (-31.318617745, -98.418811003))
            Line((-31.318617745, -98.418811003), (-30.1080177856, -99.4485957889))
            ThreePointArc((-30.1080177856, -99.4485957889), (-29.8936506369, -99.7526240879), (-29.852613442, -100.1223570045))
            Line((-29.852613442, -100.1223570045), (-29.8090350527, -101.8276671962))
        make_face(mode=Mode.SUBTRACT)
        with Locations((-22.5797742605, -100.1924086013)):
            Circle(F2_R, mode=Mode.SUBTRACT)
    with SkipClean():  # cleaning this boolean's faces spoils the solid; the shape is the same uncleaned
        extrude(amount=F3_DEPTH)

    # F4 (on face) → F5 (cut)
    with BuildSketch(Plane.XY.offset(1.9812)):
        with BuildLine():
            Line((-27.0608905703, 103.9116269755), (-27.0608905703, 96.3824086013))
            Line((-27.0608905703, 96.3824086013), (-25.6948654508, 96.3824086013))
            Line((-25.6948654508, 96.3824086013), (-17.9199781269, 97.4601045907))
            Line((-17.9199781269, 97.4601045907), (-17.9199781269, 103.9116269755))
            ThreePointArc((-17.9199781269, 103.9116269755), (-18.2919525148, 104.8096525876), (-19.1899781269, 105.1816269755))
            Line((-19.1899781269, 105.1816269755), (-25.7908905703, 105.1816269755))
            ThreePointArc((-25.7908905703, 105.1816269755), (-26.6889161824, 104.8096525876), (-27.0608905703, 103.9116269755))
        make_face()
    extrude(amount=-F5_DEPTH, mode=Mode.SUBTRACT)

    add(f1.part.fix(), mode=Mode.REPLACE)


with BuildPart() as f6_1:
    # F6: instance of F1
    add(f1.part.mirror(Plane.XZ), clean=False)


solid = Compound([f1.part, f6_1.part])
